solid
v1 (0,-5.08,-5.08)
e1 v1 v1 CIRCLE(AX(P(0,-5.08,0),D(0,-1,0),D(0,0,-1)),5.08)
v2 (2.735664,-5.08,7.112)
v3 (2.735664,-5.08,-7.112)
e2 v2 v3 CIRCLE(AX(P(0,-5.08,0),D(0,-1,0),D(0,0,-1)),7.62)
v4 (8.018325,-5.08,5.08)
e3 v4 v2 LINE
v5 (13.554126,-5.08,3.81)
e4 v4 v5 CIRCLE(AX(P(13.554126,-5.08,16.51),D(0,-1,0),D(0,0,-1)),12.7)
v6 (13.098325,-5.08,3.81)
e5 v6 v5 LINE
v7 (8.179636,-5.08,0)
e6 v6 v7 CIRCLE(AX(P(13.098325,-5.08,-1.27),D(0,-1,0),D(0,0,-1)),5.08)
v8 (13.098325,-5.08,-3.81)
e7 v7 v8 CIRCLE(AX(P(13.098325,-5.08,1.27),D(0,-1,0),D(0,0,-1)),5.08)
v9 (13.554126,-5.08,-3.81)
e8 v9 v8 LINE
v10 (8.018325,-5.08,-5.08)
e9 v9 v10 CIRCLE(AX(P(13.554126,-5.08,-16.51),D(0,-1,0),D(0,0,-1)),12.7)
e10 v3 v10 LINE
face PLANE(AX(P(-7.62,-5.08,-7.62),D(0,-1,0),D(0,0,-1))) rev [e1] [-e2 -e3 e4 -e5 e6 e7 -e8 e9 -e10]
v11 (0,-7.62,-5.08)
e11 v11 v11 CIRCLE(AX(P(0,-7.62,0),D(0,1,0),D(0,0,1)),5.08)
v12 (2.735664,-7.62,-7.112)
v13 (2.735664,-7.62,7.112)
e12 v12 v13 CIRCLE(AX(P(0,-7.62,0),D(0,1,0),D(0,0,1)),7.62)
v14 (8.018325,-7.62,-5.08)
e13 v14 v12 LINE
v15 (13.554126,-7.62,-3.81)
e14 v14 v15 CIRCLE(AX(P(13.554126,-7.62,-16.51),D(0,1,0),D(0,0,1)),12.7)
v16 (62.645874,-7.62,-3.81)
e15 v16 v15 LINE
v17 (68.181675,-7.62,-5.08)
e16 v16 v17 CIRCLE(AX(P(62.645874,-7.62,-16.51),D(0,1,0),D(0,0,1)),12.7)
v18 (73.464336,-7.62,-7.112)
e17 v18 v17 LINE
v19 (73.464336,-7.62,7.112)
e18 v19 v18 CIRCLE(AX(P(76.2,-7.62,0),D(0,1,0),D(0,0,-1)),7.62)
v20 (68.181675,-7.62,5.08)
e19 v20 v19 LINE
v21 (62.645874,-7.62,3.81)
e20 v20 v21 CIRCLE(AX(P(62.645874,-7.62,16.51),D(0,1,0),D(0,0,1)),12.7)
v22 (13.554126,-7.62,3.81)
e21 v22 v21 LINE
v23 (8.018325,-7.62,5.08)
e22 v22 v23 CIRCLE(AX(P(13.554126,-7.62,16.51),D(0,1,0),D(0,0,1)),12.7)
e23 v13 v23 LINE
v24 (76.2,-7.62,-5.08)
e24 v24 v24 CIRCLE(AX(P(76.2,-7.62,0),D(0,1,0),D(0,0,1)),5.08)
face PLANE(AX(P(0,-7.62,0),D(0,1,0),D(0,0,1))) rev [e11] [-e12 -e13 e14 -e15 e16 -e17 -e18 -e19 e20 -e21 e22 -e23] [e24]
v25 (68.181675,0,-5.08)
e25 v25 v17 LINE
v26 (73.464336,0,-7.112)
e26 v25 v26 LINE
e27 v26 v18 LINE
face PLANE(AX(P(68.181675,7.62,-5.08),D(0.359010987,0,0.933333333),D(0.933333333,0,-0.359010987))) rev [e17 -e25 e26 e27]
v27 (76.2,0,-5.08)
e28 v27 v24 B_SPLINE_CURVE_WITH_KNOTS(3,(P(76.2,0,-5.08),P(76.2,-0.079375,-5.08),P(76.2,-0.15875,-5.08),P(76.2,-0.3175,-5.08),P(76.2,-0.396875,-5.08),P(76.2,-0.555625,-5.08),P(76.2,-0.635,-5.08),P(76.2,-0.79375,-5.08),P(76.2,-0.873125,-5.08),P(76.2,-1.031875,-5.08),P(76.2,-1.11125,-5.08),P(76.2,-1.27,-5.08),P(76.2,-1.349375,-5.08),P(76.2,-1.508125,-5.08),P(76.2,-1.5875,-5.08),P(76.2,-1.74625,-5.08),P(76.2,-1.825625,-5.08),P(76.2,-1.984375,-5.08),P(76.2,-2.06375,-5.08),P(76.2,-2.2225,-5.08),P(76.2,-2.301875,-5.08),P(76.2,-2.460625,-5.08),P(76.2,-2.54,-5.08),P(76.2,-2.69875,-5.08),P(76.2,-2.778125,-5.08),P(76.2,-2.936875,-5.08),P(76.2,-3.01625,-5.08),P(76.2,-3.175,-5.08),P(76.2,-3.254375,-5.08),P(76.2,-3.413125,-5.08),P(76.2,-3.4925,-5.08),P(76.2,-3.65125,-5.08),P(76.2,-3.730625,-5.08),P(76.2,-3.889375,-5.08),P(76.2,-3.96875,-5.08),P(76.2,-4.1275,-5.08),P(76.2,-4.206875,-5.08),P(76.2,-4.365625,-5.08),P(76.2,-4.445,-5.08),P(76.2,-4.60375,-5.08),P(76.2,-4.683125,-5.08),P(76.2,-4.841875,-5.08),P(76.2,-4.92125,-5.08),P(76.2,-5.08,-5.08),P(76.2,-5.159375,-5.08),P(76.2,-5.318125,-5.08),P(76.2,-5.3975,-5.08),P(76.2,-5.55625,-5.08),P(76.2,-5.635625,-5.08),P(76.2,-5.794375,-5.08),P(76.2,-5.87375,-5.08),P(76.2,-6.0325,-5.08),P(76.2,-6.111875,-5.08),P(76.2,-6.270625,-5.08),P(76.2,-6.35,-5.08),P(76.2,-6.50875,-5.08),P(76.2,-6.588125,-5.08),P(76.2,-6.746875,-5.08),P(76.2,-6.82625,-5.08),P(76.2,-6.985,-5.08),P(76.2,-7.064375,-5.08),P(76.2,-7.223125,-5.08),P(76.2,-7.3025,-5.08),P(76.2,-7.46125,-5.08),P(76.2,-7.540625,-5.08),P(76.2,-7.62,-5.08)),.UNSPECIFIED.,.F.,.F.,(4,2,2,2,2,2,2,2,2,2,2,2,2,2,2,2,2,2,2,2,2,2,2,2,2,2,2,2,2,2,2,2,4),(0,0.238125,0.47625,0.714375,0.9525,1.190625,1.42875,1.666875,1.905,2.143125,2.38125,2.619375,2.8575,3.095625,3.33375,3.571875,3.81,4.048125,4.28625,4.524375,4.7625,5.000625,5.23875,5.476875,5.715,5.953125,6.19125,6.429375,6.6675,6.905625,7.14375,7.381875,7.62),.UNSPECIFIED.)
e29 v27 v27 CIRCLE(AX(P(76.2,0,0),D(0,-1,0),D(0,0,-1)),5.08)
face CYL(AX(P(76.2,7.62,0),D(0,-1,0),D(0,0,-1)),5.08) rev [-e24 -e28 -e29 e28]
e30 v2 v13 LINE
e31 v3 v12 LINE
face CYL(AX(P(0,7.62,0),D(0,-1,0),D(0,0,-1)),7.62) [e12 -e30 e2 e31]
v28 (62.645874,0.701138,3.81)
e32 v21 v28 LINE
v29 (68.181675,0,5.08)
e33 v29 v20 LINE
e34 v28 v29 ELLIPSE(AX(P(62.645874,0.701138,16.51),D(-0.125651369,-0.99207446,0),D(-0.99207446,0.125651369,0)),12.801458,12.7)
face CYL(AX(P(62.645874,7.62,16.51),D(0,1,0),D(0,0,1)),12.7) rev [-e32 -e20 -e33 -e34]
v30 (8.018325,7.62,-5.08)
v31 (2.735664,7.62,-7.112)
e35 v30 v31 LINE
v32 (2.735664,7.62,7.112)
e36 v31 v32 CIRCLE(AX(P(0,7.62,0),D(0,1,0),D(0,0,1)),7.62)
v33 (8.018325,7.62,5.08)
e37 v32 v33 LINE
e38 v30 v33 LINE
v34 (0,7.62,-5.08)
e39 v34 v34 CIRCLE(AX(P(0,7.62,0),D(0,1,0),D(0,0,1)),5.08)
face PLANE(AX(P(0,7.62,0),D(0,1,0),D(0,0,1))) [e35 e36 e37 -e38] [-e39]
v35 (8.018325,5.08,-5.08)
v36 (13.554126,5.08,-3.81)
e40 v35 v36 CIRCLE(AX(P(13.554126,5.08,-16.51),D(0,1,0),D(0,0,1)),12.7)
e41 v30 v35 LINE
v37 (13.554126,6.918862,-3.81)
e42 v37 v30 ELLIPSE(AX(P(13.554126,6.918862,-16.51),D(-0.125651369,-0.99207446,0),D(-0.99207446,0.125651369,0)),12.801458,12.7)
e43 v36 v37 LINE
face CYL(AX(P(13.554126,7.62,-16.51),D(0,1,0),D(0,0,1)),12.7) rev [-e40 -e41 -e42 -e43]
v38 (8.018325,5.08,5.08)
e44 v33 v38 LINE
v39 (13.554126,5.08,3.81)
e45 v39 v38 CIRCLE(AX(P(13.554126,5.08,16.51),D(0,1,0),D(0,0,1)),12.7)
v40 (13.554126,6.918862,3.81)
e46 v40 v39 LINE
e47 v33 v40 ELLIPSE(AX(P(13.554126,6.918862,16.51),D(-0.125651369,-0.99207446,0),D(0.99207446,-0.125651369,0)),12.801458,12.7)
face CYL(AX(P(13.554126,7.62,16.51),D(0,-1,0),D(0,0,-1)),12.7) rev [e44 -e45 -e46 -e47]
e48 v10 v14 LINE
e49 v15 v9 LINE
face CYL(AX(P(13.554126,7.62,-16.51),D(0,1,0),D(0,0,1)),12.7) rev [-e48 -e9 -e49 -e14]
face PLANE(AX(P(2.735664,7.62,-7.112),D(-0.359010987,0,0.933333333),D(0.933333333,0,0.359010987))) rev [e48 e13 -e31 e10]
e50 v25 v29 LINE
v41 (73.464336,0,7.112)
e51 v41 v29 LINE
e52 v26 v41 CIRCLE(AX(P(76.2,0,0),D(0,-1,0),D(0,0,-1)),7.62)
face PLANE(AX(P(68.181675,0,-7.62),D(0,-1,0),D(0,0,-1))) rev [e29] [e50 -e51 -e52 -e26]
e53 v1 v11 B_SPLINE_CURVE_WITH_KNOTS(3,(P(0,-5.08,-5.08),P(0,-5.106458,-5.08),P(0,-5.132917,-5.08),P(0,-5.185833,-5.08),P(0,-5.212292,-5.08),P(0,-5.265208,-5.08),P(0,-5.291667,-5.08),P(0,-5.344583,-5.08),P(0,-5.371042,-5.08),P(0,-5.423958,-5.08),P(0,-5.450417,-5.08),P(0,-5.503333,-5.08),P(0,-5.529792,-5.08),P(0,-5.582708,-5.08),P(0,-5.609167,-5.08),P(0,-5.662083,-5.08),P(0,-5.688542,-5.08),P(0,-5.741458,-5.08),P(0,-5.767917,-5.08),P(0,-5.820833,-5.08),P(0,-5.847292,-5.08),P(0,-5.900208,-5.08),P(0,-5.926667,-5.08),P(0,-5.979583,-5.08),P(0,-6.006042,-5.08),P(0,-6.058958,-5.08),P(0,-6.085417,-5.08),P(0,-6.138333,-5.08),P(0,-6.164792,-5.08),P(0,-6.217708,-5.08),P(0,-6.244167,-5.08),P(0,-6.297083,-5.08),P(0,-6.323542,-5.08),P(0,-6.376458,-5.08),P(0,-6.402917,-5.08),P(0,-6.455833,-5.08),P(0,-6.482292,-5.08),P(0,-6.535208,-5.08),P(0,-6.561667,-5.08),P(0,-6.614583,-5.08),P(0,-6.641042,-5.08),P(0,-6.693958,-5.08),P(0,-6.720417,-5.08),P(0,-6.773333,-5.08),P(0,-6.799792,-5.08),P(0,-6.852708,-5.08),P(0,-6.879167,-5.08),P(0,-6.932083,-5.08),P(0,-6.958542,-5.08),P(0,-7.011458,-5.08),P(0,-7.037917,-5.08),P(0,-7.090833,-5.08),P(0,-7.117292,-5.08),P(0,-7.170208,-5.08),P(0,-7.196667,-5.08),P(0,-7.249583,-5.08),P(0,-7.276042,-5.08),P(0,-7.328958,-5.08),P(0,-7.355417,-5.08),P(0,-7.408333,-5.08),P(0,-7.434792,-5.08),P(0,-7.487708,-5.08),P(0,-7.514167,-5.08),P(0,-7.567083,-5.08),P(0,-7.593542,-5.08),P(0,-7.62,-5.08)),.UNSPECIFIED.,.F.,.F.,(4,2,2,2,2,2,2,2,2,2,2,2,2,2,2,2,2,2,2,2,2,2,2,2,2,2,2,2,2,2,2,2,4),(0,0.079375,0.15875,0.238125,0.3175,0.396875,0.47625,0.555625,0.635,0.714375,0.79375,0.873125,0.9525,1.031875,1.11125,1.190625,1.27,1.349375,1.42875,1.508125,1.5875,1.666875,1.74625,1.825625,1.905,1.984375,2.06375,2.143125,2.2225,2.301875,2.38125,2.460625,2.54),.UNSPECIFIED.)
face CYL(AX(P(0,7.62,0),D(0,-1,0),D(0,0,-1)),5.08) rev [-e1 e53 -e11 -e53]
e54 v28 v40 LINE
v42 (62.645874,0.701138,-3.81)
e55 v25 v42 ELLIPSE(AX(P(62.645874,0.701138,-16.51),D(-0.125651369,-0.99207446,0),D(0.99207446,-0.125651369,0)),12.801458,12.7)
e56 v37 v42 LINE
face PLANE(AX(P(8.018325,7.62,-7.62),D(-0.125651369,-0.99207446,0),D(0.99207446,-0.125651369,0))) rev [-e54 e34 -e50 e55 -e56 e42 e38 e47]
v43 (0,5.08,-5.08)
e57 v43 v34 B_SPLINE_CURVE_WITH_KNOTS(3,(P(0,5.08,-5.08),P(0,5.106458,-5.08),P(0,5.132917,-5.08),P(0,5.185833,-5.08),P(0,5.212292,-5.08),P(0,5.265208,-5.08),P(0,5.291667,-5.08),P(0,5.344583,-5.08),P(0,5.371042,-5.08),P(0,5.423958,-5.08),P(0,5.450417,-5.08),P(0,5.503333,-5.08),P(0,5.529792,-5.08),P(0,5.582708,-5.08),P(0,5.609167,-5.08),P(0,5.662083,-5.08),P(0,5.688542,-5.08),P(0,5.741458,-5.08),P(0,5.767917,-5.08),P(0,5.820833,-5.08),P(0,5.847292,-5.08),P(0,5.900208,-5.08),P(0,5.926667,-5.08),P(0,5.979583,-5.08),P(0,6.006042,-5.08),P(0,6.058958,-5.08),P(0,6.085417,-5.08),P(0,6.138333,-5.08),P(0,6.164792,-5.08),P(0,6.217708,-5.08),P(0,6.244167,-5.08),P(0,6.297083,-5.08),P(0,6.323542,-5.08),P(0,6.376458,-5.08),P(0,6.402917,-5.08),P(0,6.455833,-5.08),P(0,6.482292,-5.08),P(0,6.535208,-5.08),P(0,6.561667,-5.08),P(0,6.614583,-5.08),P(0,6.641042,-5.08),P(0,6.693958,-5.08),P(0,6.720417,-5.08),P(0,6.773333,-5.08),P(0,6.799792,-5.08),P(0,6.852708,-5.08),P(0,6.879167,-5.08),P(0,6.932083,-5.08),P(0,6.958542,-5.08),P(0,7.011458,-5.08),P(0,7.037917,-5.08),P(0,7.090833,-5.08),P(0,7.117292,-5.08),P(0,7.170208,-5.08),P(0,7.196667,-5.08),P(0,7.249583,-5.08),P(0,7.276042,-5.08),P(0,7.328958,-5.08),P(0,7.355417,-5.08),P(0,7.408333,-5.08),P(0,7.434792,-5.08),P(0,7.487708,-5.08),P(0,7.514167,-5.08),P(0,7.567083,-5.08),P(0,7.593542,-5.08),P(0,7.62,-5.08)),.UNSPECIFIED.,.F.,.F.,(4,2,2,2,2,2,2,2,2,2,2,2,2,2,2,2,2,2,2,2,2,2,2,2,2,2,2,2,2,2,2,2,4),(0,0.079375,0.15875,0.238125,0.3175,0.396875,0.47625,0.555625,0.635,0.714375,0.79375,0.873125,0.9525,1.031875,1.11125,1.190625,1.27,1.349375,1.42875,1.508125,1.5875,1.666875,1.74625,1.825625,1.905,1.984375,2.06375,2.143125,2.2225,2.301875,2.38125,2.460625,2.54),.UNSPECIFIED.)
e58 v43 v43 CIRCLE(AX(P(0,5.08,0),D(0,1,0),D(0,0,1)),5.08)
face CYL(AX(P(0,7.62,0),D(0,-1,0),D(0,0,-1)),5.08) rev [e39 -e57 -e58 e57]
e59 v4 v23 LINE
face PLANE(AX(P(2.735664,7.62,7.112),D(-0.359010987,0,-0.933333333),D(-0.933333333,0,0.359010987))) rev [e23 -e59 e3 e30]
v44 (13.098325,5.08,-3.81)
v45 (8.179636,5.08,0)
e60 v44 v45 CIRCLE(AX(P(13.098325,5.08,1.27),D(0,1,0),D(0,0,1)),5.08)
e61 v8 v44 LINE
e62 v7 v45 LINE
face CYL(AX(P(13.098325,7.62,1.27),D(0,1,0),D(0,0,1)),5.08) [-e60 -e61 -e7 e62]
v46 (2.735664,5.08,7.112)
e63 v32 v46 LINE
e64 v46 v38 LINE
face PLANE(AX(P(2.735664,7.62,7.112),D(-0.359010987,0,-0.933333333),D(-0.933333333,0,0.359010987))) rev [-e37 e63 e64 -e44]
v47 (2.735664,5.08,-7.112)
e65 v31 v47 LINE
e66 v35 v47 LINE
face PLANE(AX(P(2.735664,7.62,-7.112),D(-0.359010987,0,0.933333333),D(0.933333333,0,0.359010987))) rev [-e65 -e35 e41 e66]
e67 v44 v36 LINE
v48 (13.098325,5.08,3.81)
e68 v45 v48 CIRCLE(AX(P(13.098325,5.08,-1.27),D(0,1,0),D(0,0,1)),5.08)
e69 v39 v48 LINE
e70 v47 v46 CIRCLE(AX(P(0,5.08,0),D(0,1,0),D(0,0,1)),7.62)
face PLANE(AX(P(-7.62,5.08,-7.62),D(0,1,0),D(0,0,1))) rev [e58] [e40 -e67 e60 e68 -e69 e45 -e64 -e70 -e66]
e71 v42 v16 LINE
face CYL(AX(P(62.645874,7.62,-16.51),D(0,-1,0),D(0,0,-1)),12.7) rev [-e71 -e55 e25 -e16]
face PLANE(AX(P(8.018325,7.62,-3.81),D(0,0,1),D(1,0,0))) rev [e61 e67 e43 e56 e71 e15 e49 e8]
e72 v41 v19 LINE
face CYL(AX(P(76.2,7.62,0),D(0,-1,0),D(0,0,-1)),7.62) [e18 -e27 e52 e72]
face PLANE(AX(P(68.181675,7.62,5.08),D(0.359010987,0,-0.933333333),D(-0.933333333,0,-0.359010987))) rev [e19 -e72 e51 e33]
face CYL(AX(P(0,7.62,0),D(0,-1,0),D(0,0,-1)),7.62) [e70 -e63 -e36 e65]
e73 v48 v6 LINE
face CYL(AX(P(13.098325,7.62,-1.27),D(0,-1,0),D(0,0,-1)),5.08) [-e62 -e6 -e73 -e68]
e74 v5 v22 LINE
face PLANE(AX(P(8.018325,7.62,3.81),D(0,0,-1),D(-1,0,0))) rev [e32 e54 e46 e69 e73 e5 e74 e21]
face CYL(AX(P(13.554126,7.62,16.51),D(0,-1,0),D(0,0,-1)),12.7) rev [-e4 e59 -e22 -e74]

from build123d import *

# Parameters (mm, degrees)
SKETCH1_R           = 5.08
BOSS_EXTRUDE1_DEPTH = 7.62
SKETCH2_W           = 15.638324702
SKETCH2_H           = 10.16
CUT_EXTRUDE1_DEPTH  = 87.890649094
FILLET1_R           = 12.7
FILLET2_R           = 5.08


with BuildPart() as part:
    # Sketch1 → Boss-Extrude1 (new, symmetric)
    with BuildSketch(Plane(origin=(0, 0, 0), x_dir=(1, 0, 0), z_dir=(0, 1, 0))):
        with BuildLine():
            Line((2.735663722, 7.112), (8.018324702, 5.08))
            Line((8.018324702, 5.08), (8.018324702, 3.81))
            Line((8.018324702, 3.81), (68.181675298, 3.81))
            Line((68.181675298, 3.81), (68.181675298, 5.08))
            Line((68.181675298, 5.08), (73.464336278, 7.112))
            ThreePointArc((73.464336278, 7.112), (83.82, 0), (73.464336278, -7.112))
            Line((73.464336278, -7.112), (68.181675298, -5.08))
            Line((68.181675298, -5.08), (68.181675298, -3.81))
            Line((68.181675298, -3.81), (8.018324702, -3.81))
            Line((8.018324702, -3.81), (8.018324702, -5.08))
            Line((8.018324702, -5.08), (2.735663722, -7.112))
            ThreePointArc((2.735663722, -7.112), (-7.62, 0), (2.735663722, 7.112))
        make_face()
        with Locations(Location((0, 0, 0), (0, 0, 90))):
            Circle(SKETCH1_R, mode=Mode.SUBTRACT)
        with Locations(Location((76.2, 0, 0), (0, 0, 90))):
            Circle(SKETCH1_R, mode=Mode.SUBTRACT)
    extrude(amount=BOSS_EXTRUDE1_DEPTH, both=True)

    # Sketch2 → Cut-Extrude1 (cut, through all)
    with BuildSketch(Plane.XY.offset(13.97)):
        Polygon((8.018324702, 7.62), (68.181675298, 0), (83.82, 0), (83.82, 7.62), align=None)
        with Locations((0.199162351, 0)):
            Rectangle(SKETCH2_W, SKETCH2_H)
    extrude(amount=-CUT_EXTRUDE1_DEPTH, mode=Mode.SUBTRACT)

    # Fillet1
    # the kernel refuses this fillet: 12.7 mm, written as the material it adds along each edge
    with BuildSketch(Plane(origin=(68.181675298, 13.839504146, 3.81), x_dir=(-1, 0, 0), z_dir=(0, -1, 0))) as fillet1_piece_1_section:
        with BuildLine():
            CenterArc((5.535801658, -12.7), FILLET1_R, 90, 25.841932763)
            Line((0, -1.27), (0, 0))
            Line((0, 0), (5.535801658, 0))
        make_face()
    fillet1_piece_1 = extrude(amount=21.459504146, mode=Mode.PRIVATE)
    fillet1_piece_1 = split(fillet1_piece_1, bisect_by=Plane(origin=(64.458294063, 0.471585521, 3.912132652), z_dir=(-0.12565136927087708, -0.9920744596048997, 0)), keep=Keep.TOP, mode=Mode.PRIVATE)
    add(fillet1_piece_1)
    with BuildSketch(Plane(origin=(68.181675298, 13.839504146, -3.81), x_dir=(0, 0, -1), z_dir=(0, -1, 0))) as fillet1_piece_2_section:
        with BuildLine():
            CenterArc((12.7, -5.535801658), FILLET1_R, 154.158067237, 25.841932763)
            Line((0, -5.535801658), (0, 0))
            Line((0, 0), (1.27, 0))
        make_face()
    fillet1_piece_2 = extrude(amount=21.459504146, mode=Mode.PRIVATE)
    fillet1_piece_2 = split(fillet1_piece_2, bisect_by=Plane(origin=(67.224480553, 0.121233673, -4.63296), z_dir=(-0.12565136927087708, -0.9920744596048997, 0)), keep=Keep.TOP, mode=Mode.PRIVATE)
    add(fillet1_piece_2)
    with BuildSketch(Plane(origin=(8.018324702, 8.759504146, -3.81), x_dir=(1, 0, 0), z_dir=(0, -1, 0))) as fillet1_piece_3_section:
        with BuildLine():
            CenterArc((5.535801658, -12.7), FILLET1_R, 90, 25.841932763)
            Line((0, -1.27), (0, 0))
            Line((0, 0), (5.535801658, 0))
        make_face()
    fillet1_piece_3 = extrude(amount=30.219008291, mode=Mode.PRIVATE)
    fillet1_piece_3 = split(fillet1_piece_3, bisect_by=Plane(origin=(11.757033309, 5.08, -3.912132652), z_dir=(0, 1, 0)), keep=Keep.TOP, mode=Mode.PRIVATE)
    fillet1_piece_3 = split(fillet1_piece_3, bisect_by=Plane(origin=(11.871985872, 7.131913851, -3.912132652), z_dir=(-0.12565136927087708, -0.9920744596048997, 0)), keep=Keep.TOP, mode=Mode.PRIVATE)
    add(fillet1_piece_3)
    with BuildSketch(Plane(origin=(8.018324702, -5.08, -3.81), x_dir=(1, 0, 0), z_dir=(0, -1, 0))) as fillet1_piece_4:
        with BuildLine():
            CenterArc((5.535801658, -12.7), FILLET1_R, 90, 25.841932763)
            Line((0, -1.27), (0, 0))
            Line((0, 0), (5.535801658, 0))
        make_face()
    extrude(amount=2.54)
    with BuildSketch(Plane(origin=(8.018324702, 21.459504146, -3.81), x_dir=(0, 0, -1), z_dir=(0, -1, 0))) as fillet1_piece_5_section:
        with BuildLine():
            CenterArc((12.7, 5.535801658), FILLET1_R, 180, 25.841932763)
            Line((0, 5.535801658), (0, 0))
            Line((0, 0), (1.27, 0))
        make_face()
    fillet1_piece_5 = extrude(amount=16.379504146, mode=Mode.PRIVATE)
    fillet1_piece_5 = split(fillet1_piece_5, bisect_by=Plane(origin=(9.128609354, 7.479376698, -4.63296), z_dir=(-0.12565136927087708, -0.9920744596048997, 0)), keep=Keep.TOP, mode=Mode.PRIVATE)
    add(fillet1_piece_5)
    with BuildSketch(Plane(origin=(8.018324702, 21.459504146, -3.81), x_dir=(0, 0, -1), z_dir=(0, -1, 0))) as fillet1_piece_6_section:
        with BuildLine():
            CenterArc((12.7, 5.535801658), FILLET1_R, 180, 25.841932763)
            Line((0, 5.535801658), (0, 0))
            Line((0, 0), (1.27, 0))
        make_face()
    fillet1_piece_6 = extrude(amount=30.219008291, mode=Mode.PRIVATE)
    fillet1_piece_6 = split(fillet1_piece_6, bisect_by=Plane(origin=(8.985567945, -7.62, -4.63296), z_dir=(0, 1, 0)), keep=Keep.TOP, mode=Mode.PRIVATE)
    fillet1_piece_6 = split(fillet1_piece_6, bisect_by=Plane(origin=(8.985567945, -5.08, -4.63296), z_dir=(0, -1, 0)), keep=Keep.TOP, mode=Mode.PRIVATE)
    add(fillet1_piece_6)
    with BuildSketch(Plane(origin=(8.018324702, 21.459504146, 3.81), x_dir=(0, 0, 1), z_dir=(0, -1, 0))) as fillet1_piece_7_section:
        with BuildLine():
            CenterArc((12.7, -5.535801658), FILLET1_R, 154.158067237, 25.841932763)
            Line((0, -5.535801658), (0, 0))
            Line((0, 0), (1.27, 0))
        make_face()
    fillet1_piece_7 = extrude(amount=16.379504146, mode=Mode.PRIVATE)
    fillet1_piece_7 = split(fillet1_piece_7, bisect_by=Plane(origin=(9.128609354, 7.479376698, 4.63296), z_dir=(-0.12565136927087708, -0.9920744596048997, 0)), keep=Keep.TOP, mode=Mode.PRIVATE)
    add(fillet1_piece_7)
    with BuildSketch(Plane(origin=(8.018324702, 21.459504146, 3.81), x_dir=(0, 0, 1), z_dir=(0, -1, 0))) as fillet1_piece_8_section:
        with BuildLine():
            CenterArc((12.7, -5.535801658), FILLET1_R, 154.158067237, 25.841932763)
            Line((0, -5.535801658), (0, 0))
            Line((0, 0), (1.27, 0))
        make_face()
    fillet1_piece_8 = extrude(amount=30.219008291, mode=Mode.PRIVATE)
    fillet1_piece_8 = split(fillet1_piece_8, bisect_by=Plane(origin=(8.985567945, -7.62, 4.63296), z_dir=(0, 1, 0)), keep=Keep.TOP, mode=Mode.PRIVATE)
    fillet1_piece_8 = split(fillet1_piece_8, bisect_by=Plane(origin=(8.985567945, -5.08, 4.63296), z_dir=(0, -1, 0)), keep=Keep.TOP, mode=Mode.PRIVATE)
    add(fillet1_piece_8)
    with BuildSketch(Plane(origin=(8.018324702, 8.759504146, 3.81), x_dir=(0, 0, 1), z_dir=(0, -1, 0))) as fillet1_piece_9_section:
        with BuildLine():
            CenterArc((12.7, -5.535801658), FILLET1_R, 154.158067237, 25.841932763)
            Line((0, -5.535801658), (0, 0))
            Line((0, 0), (1.27, 0))
        make_face()
    fillet1_piece_9 = extrude(amount=30.219008291, mode=Mode.PRIVATE)
    fillet1_piece_9 = split(fillet1_piece_9, bisect_by=Plane(origin=(8.985567945, 5.08, 4.63296), z_dir=(0, 1, 0)), keep=Keep.TOP, mode=Mode.PRIVATE)
    fillet1_piece_9 = split(fillet1_piece_9, bisect_by=Plane(origin=(9.128609354, 7.479376698, 4.63296), z_dir=(-0.12565136927087708, -0.9920744596048997, 0)), keep=Keep.TOP, mode=Mode.PRIVATE)
    add(fillet1_piece_9)
    with BuildSketch(Plane(origin=(8.018324702, -5.08, 3.81), x_dir=(0, 0, 1), z_dir=(0, -1, 0))) as fillet1_piece_10:
        with BuildLine():
            CenterArc((12.7, -5.535801658), FILLET1_R, 154.158067237, 25.841932763)
            Line((0, -5.535801658), (0, 0))
            Line((0, 0), (1.27, 0))
        make_face()
    extrude(amount=2.54)

    # Fillet2
    # the kernel refuses this fillet: 5.08 mm, written as the material it takes off along each edge
    with BuildSketch(Plane(origin=(8.018324702, 5.08, -3.81), x_dir=(0, 0, 1), z_dir=(0, -1, 0)), Plane(origin=(8.018324702, 5.08, 3.81), x_dir=(1, 0, 0), z_dir=(0, -1, 0))) as fillet2_piece_1:
        with BuildLine():
            CenterArc((FILLET2_R, -FILLET2_R), FILLET2_R, 90, 90)
            Line((0, -FILLET2_R), (0, 0))
            Line((0, 0), (FILLET2_R, 0))
        make_face()
    extrude(amount=10.16, mode=Mode.SUBTRACT)


solid = part.part
